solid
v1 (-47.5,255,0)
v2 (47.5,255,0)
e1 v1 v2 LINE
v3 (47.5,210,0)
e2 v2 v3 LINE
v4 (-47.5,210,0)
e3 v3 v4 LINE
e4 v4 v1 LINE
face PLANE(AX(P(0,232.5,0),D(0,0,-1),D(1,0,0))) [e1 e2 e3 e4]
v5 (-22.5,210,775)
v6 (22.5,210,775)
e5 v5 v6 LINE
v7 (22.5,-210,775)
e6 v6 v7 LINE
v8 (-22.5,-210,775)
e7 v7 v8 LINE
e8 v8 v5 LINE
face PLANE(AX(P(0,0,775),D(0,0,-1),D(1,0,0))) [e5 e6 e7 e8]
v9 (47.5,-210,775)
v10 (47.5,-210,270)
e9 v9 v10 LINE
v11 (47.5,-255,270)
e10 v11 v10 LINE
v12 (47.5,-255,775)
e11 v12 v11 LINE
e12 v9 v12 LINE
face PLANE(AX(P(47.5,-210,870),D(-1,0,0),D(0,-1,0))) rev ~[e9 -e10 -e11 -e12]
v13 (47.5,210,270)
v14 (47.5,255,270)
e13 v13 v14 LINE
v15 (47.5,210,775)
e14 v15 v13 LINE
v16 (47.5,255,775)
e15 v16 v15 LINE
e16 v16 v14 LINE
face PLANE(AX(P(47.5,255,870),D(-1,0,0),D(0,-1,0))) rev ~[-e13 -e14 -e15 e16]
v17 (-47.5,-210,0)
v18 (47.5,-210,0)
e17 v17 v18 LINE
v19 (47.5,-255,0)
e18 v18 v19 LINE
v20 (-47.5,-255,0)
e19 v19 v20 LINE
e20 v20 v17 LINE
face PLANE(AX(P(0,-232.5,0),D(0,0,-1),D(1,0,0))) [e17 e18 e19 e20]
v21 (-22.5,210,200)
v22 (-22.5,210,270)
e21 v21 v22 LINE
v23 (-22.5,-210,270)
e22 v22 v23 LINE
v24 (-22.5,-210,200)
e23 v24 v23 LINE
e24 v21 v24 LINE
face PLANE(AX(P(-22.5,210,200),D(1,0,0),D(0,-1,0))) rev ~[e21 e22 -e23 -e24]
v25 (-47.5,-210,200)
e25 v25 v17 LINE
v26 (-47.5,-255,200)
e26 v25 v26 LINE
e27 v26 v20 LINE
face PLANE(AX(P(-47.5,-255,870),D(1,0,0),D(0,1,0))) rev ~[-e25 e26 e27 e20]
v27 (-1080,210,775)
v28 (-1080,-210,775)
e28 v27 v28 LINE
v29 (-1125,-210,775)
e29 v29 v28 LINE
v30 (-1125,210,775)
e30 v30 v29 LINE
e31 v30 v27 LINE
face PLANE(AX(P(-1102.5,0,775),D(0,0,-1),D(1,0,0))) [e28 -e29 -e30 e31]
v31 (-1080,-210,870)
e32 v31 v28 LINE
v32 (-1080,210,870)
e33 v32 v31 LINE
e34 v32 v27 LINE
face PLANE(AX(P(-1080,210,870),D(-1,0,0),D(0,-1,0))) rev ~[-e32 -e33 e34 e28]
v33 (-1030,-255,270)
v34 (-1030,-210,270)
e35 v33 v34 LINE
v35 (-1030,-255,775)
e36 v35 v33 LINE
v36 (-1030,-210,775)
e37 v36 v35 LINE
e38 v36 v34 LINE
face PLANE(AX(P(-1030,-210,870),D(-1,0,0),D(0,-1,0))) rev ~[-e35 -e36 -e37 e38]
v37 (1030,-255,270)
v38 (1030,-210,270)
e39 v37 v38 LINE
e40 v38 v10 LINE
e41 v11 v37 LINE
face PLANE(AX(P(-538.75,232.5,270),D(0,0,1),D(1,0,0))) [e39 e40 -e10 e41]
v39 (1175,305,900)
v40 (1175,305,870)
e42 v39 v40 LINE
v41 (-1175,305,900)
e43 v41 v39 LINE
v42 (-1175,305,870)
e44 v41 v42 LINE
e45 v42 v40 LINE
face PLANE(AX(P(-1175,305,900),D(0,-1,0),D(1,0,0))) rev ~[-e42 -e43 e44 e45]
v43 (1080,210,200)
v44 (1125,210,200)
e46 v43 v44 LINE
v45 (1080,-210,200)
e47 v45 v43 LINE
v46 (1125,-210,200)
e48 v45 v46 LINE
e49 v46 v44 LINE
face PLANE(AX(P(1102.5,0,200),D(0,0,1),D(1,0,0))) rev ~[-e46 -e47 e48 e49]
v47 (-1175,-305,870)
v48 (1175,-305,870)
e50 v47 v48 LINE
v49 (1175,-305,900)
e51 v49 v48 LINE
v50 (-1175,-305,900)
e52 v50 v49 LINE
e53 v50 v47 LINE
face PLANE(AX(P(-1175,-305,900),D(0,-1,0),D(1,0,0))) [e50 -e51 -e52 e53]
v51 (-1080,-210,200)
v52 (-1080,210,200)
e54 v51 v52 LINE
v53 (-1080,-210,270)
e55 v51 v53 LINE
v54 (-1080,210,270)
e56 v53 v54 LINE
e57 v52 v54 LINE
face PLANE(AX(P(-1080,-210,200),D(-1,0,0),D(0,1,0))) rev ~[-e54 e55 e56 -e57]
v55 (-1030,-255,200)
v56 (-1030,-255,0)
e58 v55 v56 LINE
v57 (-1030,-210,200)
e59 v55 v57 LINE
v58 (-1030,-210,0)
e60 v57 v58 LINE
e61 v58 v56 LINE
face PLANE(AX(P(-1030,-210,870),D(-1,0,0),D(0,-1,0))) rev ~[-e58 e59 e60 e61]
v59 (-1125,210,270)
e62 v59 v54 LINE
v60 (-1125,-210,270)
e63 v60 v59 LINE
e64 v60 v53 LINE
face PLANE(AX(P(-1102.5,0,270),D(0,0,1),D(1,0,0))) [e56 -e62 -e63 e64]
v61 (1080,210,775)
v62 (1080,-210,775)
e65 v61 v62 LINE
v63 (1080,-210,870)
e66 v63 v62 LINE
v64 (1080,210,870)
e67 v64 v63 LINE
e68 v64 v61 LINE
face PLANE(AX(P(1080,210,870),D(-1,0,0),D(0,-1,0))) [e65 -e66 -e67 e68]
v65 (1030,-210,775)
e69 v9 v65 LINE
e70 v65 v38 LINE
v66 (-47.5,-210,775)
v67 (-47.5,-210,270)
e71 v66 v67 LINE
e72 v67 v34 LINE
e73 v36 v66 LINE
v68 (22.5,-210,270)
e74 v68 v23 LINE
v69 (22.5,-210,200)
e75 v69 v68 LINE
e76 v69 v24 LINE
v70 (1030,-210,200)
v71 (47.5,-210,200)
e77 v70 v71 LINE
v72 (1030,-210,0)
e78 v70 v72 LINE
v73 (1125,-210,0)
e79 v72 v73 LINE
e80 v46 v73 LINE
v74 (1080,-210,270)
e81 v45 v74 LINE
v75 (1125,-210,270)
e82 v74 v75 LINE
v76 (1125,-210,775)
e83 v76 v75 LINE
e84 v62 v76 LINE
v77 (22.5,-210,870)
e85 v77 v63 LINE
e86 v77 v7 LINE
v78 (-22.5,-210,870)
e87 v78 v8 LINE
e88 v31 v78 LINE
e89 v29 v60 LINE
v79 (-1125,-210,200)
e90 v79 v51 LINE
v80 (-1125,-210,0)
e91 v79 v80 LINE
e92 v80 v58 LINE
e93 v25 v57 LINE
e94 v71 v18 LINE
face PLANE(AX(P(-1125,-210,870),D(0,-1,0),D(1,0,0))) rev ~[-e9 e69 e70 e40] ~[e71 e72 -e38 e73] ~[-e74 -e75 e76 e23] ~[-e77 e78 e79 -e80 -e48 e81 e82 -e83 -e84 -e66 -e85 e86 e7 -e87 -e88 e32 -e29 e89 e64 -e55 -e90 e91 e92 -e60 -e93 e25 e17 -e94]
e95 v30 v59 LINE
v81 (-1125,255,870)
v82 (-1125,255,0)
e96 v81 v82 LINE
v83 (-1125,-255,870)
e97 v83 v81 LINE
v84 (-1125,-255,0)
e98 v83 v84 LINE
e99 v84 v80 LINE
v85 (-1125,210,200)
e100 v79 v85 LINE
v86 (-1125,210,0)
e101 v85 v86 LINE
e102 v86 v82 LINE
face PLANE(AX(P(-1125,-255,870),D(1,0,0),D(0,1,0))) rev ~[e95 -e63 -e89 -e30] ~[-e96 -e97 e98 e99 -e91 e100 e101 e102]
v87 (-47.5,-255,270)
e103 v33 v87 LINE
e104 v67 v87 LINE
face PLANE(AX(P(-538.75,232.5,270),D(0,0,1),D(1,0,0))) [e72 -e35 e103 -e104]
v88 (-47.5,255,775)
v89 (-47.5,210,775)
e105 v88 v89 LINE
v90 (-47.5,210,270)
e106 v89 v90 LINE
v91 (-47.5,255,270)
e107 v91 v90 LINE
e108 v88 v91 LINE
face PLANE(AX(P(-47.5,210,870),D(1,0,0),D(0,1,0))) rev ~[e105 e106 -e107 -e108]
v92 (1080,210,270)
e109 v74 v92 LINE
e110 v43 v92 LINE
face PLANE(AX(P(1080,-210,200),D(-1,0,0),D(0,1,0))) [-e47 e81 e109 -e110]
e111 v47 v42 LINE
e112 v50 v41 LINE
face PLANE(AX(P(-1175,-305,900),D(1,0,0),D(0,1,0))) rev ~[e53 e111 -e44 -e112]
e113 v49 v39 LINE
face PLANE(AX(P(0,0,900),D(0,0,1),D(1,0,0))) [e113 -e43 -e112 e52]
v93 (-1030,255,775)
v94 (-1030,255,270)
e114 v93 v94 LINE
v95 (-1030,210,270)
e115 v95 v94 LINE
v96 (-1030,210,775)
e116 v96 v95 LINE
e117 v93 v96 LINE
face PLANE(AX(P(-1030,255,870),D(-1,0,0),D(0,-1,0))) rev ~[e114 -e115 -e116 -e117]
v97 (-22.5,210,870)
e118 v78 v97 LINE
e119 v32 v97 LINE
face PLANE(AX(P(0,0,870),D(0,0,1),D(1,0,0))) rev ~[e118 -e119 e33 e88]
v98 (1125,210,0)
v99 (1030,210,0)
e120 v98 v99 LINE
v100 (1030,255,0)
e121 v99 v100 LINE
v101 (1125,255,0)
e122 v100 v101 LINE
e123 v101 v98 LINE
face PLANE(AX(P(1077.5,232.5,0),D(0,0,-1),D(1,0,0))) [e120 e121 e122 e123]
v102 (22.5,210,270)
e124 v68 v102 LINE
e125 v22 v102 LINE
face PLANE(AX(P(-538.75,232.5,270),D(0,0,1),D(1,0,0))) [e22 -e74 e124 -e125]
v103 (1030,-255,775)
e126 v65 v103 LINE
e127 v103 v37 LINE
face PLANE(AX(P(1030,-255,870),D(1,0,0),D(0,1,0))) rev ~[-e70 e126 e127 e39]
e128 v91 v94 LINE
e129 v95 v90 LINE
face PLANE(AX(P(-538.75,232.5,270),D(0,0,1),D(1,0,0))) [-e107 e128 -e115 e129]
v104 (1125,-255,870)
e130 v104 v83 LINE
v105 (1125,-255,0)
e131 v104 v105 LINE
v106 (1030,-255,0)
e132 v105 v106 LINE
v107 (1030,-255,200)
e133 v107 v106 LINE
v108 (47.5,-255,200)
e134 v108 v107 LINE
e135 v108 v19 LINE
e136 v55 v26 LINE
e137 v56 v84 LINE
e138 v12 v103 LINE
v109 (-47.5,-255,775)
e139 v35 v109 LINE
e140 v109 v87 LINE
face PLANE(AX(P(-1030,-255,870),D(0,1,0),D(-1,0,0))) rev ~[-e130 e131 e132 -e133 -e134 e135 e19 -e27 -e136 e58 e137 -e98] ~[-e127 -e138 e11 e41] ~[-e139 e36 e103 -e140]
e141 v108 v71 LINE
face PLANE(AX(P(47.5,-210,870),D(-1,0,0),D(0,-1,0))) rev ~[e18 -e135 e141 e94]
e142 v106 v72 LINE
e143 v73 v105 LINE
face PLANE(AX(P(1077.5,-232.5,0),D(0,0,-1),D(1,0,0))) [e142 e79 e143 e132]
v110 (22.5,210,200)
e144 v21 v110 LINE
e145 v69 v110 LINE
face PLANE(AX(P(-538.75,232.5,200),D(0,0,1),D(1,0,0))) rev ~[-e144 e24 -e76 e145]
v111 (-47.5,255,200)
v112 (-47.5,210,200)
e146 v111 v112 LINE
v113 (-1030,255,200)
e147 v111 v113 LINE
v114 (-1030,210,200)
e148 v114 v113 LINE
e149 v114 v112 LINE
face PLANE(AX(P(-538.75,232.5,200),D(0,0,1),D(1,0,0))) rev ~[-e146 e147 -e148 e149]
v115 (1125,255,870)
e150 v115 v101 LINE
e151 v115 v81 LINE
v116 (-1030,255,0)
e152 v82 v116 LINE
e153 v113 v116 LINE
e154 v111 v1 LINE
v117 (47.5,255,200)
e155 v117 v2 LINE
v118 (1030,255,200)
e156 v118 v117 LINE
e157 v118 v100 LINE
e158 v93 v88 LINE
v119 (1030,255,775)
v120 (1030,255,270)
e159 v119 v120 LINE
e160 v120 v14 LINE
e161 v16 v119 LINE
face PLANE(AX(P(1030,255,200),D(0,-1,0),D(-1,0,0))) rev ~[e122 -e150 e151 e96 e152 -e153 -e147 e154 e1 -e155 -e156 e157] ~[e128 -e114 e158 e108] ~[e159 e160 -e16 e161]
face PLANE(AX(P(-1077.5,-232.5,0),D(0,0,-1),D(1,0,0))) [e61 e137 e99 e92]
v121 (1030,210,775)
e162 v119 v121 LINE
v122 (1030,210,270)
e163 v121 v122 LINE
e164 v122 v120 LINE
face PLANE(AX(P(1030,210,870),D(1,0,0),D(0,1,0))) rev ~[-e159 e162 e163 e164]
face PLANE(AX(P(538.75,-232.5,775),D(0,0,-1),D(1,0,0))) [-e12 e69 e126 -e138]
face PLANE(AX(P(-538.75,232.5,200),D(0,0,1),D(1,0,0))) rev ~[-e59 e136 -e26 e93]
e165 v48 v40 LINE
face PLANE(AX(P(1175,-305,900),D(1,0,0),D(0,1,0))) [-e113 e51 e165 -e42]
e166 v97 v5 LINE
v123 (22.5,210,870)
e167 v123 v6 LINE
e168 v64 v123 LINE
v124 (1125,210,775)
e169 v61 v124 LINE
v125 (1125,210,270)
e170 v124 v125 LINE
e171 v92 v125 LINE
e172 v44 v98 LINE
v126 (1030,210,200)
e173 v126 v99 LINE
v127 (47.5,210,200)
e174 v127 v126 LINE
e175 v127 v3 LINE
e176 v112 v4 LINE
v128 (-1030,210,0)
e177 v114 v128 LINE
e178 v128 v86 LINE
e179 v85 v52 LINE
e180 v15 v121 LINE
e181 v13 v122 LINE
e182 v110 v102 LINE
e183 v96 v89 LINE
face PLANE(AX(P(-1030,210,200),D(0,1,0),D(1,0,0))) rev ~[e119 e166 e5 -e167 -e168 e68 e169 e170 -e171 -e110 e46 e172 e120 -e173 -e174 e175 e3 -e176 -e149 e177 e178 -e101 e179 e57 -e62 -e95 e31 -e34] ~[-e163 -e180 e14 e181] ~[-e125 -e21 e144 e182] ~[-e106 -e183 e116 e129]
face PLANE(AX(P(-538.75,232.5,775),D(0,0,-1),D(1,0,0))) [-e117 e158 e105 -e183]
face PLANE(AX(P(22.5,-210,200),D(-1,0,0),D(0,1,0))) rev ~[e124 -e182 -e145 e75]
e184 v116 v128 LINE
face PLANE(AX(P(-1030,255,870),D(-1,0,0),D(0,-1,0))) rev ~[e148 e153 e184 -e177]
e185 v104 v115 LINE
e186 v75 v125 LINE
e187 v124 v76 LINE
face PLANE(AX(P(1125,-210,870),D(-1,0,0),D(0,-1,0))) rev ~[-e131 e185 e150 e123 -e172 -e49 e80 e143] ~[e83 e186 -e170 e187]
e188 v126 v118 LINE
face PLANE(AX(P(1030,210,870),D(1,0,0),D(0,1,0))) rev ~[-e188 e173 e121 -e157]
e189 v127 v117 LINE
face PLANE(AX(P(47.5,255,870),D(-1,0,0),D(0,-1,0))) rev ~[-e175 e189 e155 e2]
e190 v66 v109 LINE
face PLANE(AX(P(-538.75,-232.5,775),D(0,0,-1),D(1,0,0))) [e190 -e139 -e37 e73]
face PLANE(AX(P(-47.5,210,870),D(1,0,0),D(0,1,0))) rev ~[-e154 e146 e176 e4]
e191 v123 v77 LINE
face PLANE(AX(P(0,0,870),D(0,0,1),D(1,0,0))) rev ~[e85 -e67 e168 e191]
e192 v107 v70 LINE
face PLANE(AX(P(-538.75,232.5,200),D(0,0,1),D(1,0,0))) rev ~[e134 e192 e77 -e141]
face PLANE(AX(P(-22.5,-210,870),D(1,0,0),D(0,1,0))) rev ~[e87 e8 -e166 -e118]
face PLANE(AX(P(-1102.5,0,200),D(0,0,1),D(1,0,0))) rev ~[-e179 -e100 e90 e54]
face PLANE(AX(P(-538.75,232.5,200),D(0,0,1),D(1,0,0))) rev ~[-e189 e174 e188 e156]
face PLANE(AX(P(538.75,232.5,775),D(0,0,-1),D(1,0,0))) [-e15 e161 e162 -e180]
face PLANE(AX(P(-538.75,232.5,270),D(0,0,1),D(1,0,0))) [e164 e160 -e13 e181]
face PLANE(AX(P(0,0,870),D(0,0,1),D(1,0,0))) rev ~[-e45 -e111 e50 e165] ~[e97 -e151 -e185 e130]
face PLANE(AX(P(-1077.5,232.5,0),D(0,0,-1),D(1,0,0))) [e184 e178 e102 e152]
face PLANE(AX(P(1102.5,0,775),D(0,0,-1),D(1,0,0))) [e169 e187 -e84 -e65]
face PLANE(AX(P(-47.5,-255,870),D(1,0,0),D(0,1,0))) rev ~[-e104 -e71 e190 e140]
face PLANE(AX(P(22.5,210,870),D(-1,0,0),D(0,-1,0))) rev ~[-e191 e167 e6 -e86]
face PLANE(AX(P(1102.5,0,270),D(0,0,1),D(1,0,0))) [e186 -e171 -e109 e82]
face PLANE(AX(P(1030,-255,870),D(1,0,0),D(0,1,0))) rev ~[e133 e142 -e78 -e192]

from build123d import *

# Parameters (mm, degrees)
F1_W     = 2350
F1_H     = 610
F2_DEPTH = 30
F3_W     = 45
F3_H     = 420
F3_W_2   = 982.5
F3_H_2   = 45
F4_DEPTH = 95
F5_DEPTH = 870
F7_W     = 982.5
F7_H     = 45
F7_W_2   = 45
F7_H_2   = 420
F8_DEPTH = 70


# Not quite as in the source:
# - a feature names something its author has since deleted; it is built from what else it names


with BuildPart() as f2:
    # F1 (on offset) → F2 (new body)
    with BuildSketch(Plane.XY.offset(900)):
        Rectangle(F1_W, F1_H)
    extrude(amount=-F2_DEPTH)

    # F3 (on face) → F4 (join)
    with BuildSketch(Plane(origin=(0, 0, 870), x_dir=(1, 0, 0), z_dir=(0, 0, -1))):
        with Locations((-1102.5, 0)):
            Rectangle(F3_W, F3_H)
        with Locations((1102.5, 0)):
            Rectangle(F3_W, F3_H)
        with Locations((-538.75, 232.5)):
            Rectangle(F3_W_2, F3_H_2)
        with Locations((-538.75, -232.5)):
            Rectangle(F3_W_2, F3_H_2)
        Polygon((22.5, 210), (-22.5, 210), (-22.5, -210), (22.5, -210), (22.5, -47.5), (22.5, 47.5), align=None)
        with Locations((538.75, 232.5)):
            Rectangle(F3_W_2, F3_H_2)
        with Locations((538.75, -232.5)):
            Rectangle(F3_W_2, F3_H_2)
    extrude(amount=F4_DEPTH)

    # F3 (on face) → F5 (join)
    with BuildSketch(Plane(origin=(0, 0, 870), x_dir=(1, 0, 0), z_dir=(0, 0, -1))):
        Polygon((-1030, 255), (-1125, 255), (-1125, 210), (-1080, 210), (-1030, 210), align=None)
        Polygon((47.5, 255), (-47.5, 255), (-47.5, 210), (-22.5, 210), (22.5, 210), (47.5, 210), align=None)
        Polygon((-1080, -210), (-1125, -210), (-1125, -255), (-1030, -255), (-1030, -210), align=None)
        Polygon((1125, 255), (1030, 255), (1030, 210), (1080, 210), (1125, 210), align=None)
        Polygon((22.5, -210), (-22.5, -210), (-47.5, -210), (-47.5, -255), (47.5, -255), (47.5, -210), align=None)
        Polygon((1125, -210), (1080, -210), (1030, -210), (1030, -255), (1125, -255), align=None)
    extrude(amount=F5_DEPTH)

    # F7 (on offset) → F8 (join)
    with BuildSketch(Plane.XY.offset(200)):
        with Locations((-538.75, 232.5)):
            Rectangle(F7_W, F7_H)
        Polygon((22.5, 255), (-47.5, 255), (-47.5, 210), (-22.5, 210), (22.5, 210), (47.5, 210), (47.5, 255), align=None)
        Polygon((67.5, 255), (47.5, 255), (47.5, 210), (67.5, 210), (1030, 210), (1030, 255), align=None)
        Polygon((22.5, 210), (-22.5, 210), (-22.5, -210), (22.5, -210), (22.5, -47.5), (22.5, 47.5), align=None)
        Polygon((22.5, -210), (-22.5, -210), (-47.5, -210), (-47.5, -255), (22.5, -255), (47.5, -255), (47.5, -210), align=None)
        with Locations((-538.75, -232.5)):
            Rectangle(F7_W, F7_H)
        Polygon((67.5, -210), (47.5, -210), (47.5, -255), (1030, -255), (1030, -210), align=None)
        with Locations((-1102.5, 0)):
            Rectangle(F7_W_2, F7_H_2)
        with Locations((1102.5, 0)):
            Rectangle(F7_W_2, F7_H_2)
    extrude(amount=F8_DEPTH)


solid = f2.part
